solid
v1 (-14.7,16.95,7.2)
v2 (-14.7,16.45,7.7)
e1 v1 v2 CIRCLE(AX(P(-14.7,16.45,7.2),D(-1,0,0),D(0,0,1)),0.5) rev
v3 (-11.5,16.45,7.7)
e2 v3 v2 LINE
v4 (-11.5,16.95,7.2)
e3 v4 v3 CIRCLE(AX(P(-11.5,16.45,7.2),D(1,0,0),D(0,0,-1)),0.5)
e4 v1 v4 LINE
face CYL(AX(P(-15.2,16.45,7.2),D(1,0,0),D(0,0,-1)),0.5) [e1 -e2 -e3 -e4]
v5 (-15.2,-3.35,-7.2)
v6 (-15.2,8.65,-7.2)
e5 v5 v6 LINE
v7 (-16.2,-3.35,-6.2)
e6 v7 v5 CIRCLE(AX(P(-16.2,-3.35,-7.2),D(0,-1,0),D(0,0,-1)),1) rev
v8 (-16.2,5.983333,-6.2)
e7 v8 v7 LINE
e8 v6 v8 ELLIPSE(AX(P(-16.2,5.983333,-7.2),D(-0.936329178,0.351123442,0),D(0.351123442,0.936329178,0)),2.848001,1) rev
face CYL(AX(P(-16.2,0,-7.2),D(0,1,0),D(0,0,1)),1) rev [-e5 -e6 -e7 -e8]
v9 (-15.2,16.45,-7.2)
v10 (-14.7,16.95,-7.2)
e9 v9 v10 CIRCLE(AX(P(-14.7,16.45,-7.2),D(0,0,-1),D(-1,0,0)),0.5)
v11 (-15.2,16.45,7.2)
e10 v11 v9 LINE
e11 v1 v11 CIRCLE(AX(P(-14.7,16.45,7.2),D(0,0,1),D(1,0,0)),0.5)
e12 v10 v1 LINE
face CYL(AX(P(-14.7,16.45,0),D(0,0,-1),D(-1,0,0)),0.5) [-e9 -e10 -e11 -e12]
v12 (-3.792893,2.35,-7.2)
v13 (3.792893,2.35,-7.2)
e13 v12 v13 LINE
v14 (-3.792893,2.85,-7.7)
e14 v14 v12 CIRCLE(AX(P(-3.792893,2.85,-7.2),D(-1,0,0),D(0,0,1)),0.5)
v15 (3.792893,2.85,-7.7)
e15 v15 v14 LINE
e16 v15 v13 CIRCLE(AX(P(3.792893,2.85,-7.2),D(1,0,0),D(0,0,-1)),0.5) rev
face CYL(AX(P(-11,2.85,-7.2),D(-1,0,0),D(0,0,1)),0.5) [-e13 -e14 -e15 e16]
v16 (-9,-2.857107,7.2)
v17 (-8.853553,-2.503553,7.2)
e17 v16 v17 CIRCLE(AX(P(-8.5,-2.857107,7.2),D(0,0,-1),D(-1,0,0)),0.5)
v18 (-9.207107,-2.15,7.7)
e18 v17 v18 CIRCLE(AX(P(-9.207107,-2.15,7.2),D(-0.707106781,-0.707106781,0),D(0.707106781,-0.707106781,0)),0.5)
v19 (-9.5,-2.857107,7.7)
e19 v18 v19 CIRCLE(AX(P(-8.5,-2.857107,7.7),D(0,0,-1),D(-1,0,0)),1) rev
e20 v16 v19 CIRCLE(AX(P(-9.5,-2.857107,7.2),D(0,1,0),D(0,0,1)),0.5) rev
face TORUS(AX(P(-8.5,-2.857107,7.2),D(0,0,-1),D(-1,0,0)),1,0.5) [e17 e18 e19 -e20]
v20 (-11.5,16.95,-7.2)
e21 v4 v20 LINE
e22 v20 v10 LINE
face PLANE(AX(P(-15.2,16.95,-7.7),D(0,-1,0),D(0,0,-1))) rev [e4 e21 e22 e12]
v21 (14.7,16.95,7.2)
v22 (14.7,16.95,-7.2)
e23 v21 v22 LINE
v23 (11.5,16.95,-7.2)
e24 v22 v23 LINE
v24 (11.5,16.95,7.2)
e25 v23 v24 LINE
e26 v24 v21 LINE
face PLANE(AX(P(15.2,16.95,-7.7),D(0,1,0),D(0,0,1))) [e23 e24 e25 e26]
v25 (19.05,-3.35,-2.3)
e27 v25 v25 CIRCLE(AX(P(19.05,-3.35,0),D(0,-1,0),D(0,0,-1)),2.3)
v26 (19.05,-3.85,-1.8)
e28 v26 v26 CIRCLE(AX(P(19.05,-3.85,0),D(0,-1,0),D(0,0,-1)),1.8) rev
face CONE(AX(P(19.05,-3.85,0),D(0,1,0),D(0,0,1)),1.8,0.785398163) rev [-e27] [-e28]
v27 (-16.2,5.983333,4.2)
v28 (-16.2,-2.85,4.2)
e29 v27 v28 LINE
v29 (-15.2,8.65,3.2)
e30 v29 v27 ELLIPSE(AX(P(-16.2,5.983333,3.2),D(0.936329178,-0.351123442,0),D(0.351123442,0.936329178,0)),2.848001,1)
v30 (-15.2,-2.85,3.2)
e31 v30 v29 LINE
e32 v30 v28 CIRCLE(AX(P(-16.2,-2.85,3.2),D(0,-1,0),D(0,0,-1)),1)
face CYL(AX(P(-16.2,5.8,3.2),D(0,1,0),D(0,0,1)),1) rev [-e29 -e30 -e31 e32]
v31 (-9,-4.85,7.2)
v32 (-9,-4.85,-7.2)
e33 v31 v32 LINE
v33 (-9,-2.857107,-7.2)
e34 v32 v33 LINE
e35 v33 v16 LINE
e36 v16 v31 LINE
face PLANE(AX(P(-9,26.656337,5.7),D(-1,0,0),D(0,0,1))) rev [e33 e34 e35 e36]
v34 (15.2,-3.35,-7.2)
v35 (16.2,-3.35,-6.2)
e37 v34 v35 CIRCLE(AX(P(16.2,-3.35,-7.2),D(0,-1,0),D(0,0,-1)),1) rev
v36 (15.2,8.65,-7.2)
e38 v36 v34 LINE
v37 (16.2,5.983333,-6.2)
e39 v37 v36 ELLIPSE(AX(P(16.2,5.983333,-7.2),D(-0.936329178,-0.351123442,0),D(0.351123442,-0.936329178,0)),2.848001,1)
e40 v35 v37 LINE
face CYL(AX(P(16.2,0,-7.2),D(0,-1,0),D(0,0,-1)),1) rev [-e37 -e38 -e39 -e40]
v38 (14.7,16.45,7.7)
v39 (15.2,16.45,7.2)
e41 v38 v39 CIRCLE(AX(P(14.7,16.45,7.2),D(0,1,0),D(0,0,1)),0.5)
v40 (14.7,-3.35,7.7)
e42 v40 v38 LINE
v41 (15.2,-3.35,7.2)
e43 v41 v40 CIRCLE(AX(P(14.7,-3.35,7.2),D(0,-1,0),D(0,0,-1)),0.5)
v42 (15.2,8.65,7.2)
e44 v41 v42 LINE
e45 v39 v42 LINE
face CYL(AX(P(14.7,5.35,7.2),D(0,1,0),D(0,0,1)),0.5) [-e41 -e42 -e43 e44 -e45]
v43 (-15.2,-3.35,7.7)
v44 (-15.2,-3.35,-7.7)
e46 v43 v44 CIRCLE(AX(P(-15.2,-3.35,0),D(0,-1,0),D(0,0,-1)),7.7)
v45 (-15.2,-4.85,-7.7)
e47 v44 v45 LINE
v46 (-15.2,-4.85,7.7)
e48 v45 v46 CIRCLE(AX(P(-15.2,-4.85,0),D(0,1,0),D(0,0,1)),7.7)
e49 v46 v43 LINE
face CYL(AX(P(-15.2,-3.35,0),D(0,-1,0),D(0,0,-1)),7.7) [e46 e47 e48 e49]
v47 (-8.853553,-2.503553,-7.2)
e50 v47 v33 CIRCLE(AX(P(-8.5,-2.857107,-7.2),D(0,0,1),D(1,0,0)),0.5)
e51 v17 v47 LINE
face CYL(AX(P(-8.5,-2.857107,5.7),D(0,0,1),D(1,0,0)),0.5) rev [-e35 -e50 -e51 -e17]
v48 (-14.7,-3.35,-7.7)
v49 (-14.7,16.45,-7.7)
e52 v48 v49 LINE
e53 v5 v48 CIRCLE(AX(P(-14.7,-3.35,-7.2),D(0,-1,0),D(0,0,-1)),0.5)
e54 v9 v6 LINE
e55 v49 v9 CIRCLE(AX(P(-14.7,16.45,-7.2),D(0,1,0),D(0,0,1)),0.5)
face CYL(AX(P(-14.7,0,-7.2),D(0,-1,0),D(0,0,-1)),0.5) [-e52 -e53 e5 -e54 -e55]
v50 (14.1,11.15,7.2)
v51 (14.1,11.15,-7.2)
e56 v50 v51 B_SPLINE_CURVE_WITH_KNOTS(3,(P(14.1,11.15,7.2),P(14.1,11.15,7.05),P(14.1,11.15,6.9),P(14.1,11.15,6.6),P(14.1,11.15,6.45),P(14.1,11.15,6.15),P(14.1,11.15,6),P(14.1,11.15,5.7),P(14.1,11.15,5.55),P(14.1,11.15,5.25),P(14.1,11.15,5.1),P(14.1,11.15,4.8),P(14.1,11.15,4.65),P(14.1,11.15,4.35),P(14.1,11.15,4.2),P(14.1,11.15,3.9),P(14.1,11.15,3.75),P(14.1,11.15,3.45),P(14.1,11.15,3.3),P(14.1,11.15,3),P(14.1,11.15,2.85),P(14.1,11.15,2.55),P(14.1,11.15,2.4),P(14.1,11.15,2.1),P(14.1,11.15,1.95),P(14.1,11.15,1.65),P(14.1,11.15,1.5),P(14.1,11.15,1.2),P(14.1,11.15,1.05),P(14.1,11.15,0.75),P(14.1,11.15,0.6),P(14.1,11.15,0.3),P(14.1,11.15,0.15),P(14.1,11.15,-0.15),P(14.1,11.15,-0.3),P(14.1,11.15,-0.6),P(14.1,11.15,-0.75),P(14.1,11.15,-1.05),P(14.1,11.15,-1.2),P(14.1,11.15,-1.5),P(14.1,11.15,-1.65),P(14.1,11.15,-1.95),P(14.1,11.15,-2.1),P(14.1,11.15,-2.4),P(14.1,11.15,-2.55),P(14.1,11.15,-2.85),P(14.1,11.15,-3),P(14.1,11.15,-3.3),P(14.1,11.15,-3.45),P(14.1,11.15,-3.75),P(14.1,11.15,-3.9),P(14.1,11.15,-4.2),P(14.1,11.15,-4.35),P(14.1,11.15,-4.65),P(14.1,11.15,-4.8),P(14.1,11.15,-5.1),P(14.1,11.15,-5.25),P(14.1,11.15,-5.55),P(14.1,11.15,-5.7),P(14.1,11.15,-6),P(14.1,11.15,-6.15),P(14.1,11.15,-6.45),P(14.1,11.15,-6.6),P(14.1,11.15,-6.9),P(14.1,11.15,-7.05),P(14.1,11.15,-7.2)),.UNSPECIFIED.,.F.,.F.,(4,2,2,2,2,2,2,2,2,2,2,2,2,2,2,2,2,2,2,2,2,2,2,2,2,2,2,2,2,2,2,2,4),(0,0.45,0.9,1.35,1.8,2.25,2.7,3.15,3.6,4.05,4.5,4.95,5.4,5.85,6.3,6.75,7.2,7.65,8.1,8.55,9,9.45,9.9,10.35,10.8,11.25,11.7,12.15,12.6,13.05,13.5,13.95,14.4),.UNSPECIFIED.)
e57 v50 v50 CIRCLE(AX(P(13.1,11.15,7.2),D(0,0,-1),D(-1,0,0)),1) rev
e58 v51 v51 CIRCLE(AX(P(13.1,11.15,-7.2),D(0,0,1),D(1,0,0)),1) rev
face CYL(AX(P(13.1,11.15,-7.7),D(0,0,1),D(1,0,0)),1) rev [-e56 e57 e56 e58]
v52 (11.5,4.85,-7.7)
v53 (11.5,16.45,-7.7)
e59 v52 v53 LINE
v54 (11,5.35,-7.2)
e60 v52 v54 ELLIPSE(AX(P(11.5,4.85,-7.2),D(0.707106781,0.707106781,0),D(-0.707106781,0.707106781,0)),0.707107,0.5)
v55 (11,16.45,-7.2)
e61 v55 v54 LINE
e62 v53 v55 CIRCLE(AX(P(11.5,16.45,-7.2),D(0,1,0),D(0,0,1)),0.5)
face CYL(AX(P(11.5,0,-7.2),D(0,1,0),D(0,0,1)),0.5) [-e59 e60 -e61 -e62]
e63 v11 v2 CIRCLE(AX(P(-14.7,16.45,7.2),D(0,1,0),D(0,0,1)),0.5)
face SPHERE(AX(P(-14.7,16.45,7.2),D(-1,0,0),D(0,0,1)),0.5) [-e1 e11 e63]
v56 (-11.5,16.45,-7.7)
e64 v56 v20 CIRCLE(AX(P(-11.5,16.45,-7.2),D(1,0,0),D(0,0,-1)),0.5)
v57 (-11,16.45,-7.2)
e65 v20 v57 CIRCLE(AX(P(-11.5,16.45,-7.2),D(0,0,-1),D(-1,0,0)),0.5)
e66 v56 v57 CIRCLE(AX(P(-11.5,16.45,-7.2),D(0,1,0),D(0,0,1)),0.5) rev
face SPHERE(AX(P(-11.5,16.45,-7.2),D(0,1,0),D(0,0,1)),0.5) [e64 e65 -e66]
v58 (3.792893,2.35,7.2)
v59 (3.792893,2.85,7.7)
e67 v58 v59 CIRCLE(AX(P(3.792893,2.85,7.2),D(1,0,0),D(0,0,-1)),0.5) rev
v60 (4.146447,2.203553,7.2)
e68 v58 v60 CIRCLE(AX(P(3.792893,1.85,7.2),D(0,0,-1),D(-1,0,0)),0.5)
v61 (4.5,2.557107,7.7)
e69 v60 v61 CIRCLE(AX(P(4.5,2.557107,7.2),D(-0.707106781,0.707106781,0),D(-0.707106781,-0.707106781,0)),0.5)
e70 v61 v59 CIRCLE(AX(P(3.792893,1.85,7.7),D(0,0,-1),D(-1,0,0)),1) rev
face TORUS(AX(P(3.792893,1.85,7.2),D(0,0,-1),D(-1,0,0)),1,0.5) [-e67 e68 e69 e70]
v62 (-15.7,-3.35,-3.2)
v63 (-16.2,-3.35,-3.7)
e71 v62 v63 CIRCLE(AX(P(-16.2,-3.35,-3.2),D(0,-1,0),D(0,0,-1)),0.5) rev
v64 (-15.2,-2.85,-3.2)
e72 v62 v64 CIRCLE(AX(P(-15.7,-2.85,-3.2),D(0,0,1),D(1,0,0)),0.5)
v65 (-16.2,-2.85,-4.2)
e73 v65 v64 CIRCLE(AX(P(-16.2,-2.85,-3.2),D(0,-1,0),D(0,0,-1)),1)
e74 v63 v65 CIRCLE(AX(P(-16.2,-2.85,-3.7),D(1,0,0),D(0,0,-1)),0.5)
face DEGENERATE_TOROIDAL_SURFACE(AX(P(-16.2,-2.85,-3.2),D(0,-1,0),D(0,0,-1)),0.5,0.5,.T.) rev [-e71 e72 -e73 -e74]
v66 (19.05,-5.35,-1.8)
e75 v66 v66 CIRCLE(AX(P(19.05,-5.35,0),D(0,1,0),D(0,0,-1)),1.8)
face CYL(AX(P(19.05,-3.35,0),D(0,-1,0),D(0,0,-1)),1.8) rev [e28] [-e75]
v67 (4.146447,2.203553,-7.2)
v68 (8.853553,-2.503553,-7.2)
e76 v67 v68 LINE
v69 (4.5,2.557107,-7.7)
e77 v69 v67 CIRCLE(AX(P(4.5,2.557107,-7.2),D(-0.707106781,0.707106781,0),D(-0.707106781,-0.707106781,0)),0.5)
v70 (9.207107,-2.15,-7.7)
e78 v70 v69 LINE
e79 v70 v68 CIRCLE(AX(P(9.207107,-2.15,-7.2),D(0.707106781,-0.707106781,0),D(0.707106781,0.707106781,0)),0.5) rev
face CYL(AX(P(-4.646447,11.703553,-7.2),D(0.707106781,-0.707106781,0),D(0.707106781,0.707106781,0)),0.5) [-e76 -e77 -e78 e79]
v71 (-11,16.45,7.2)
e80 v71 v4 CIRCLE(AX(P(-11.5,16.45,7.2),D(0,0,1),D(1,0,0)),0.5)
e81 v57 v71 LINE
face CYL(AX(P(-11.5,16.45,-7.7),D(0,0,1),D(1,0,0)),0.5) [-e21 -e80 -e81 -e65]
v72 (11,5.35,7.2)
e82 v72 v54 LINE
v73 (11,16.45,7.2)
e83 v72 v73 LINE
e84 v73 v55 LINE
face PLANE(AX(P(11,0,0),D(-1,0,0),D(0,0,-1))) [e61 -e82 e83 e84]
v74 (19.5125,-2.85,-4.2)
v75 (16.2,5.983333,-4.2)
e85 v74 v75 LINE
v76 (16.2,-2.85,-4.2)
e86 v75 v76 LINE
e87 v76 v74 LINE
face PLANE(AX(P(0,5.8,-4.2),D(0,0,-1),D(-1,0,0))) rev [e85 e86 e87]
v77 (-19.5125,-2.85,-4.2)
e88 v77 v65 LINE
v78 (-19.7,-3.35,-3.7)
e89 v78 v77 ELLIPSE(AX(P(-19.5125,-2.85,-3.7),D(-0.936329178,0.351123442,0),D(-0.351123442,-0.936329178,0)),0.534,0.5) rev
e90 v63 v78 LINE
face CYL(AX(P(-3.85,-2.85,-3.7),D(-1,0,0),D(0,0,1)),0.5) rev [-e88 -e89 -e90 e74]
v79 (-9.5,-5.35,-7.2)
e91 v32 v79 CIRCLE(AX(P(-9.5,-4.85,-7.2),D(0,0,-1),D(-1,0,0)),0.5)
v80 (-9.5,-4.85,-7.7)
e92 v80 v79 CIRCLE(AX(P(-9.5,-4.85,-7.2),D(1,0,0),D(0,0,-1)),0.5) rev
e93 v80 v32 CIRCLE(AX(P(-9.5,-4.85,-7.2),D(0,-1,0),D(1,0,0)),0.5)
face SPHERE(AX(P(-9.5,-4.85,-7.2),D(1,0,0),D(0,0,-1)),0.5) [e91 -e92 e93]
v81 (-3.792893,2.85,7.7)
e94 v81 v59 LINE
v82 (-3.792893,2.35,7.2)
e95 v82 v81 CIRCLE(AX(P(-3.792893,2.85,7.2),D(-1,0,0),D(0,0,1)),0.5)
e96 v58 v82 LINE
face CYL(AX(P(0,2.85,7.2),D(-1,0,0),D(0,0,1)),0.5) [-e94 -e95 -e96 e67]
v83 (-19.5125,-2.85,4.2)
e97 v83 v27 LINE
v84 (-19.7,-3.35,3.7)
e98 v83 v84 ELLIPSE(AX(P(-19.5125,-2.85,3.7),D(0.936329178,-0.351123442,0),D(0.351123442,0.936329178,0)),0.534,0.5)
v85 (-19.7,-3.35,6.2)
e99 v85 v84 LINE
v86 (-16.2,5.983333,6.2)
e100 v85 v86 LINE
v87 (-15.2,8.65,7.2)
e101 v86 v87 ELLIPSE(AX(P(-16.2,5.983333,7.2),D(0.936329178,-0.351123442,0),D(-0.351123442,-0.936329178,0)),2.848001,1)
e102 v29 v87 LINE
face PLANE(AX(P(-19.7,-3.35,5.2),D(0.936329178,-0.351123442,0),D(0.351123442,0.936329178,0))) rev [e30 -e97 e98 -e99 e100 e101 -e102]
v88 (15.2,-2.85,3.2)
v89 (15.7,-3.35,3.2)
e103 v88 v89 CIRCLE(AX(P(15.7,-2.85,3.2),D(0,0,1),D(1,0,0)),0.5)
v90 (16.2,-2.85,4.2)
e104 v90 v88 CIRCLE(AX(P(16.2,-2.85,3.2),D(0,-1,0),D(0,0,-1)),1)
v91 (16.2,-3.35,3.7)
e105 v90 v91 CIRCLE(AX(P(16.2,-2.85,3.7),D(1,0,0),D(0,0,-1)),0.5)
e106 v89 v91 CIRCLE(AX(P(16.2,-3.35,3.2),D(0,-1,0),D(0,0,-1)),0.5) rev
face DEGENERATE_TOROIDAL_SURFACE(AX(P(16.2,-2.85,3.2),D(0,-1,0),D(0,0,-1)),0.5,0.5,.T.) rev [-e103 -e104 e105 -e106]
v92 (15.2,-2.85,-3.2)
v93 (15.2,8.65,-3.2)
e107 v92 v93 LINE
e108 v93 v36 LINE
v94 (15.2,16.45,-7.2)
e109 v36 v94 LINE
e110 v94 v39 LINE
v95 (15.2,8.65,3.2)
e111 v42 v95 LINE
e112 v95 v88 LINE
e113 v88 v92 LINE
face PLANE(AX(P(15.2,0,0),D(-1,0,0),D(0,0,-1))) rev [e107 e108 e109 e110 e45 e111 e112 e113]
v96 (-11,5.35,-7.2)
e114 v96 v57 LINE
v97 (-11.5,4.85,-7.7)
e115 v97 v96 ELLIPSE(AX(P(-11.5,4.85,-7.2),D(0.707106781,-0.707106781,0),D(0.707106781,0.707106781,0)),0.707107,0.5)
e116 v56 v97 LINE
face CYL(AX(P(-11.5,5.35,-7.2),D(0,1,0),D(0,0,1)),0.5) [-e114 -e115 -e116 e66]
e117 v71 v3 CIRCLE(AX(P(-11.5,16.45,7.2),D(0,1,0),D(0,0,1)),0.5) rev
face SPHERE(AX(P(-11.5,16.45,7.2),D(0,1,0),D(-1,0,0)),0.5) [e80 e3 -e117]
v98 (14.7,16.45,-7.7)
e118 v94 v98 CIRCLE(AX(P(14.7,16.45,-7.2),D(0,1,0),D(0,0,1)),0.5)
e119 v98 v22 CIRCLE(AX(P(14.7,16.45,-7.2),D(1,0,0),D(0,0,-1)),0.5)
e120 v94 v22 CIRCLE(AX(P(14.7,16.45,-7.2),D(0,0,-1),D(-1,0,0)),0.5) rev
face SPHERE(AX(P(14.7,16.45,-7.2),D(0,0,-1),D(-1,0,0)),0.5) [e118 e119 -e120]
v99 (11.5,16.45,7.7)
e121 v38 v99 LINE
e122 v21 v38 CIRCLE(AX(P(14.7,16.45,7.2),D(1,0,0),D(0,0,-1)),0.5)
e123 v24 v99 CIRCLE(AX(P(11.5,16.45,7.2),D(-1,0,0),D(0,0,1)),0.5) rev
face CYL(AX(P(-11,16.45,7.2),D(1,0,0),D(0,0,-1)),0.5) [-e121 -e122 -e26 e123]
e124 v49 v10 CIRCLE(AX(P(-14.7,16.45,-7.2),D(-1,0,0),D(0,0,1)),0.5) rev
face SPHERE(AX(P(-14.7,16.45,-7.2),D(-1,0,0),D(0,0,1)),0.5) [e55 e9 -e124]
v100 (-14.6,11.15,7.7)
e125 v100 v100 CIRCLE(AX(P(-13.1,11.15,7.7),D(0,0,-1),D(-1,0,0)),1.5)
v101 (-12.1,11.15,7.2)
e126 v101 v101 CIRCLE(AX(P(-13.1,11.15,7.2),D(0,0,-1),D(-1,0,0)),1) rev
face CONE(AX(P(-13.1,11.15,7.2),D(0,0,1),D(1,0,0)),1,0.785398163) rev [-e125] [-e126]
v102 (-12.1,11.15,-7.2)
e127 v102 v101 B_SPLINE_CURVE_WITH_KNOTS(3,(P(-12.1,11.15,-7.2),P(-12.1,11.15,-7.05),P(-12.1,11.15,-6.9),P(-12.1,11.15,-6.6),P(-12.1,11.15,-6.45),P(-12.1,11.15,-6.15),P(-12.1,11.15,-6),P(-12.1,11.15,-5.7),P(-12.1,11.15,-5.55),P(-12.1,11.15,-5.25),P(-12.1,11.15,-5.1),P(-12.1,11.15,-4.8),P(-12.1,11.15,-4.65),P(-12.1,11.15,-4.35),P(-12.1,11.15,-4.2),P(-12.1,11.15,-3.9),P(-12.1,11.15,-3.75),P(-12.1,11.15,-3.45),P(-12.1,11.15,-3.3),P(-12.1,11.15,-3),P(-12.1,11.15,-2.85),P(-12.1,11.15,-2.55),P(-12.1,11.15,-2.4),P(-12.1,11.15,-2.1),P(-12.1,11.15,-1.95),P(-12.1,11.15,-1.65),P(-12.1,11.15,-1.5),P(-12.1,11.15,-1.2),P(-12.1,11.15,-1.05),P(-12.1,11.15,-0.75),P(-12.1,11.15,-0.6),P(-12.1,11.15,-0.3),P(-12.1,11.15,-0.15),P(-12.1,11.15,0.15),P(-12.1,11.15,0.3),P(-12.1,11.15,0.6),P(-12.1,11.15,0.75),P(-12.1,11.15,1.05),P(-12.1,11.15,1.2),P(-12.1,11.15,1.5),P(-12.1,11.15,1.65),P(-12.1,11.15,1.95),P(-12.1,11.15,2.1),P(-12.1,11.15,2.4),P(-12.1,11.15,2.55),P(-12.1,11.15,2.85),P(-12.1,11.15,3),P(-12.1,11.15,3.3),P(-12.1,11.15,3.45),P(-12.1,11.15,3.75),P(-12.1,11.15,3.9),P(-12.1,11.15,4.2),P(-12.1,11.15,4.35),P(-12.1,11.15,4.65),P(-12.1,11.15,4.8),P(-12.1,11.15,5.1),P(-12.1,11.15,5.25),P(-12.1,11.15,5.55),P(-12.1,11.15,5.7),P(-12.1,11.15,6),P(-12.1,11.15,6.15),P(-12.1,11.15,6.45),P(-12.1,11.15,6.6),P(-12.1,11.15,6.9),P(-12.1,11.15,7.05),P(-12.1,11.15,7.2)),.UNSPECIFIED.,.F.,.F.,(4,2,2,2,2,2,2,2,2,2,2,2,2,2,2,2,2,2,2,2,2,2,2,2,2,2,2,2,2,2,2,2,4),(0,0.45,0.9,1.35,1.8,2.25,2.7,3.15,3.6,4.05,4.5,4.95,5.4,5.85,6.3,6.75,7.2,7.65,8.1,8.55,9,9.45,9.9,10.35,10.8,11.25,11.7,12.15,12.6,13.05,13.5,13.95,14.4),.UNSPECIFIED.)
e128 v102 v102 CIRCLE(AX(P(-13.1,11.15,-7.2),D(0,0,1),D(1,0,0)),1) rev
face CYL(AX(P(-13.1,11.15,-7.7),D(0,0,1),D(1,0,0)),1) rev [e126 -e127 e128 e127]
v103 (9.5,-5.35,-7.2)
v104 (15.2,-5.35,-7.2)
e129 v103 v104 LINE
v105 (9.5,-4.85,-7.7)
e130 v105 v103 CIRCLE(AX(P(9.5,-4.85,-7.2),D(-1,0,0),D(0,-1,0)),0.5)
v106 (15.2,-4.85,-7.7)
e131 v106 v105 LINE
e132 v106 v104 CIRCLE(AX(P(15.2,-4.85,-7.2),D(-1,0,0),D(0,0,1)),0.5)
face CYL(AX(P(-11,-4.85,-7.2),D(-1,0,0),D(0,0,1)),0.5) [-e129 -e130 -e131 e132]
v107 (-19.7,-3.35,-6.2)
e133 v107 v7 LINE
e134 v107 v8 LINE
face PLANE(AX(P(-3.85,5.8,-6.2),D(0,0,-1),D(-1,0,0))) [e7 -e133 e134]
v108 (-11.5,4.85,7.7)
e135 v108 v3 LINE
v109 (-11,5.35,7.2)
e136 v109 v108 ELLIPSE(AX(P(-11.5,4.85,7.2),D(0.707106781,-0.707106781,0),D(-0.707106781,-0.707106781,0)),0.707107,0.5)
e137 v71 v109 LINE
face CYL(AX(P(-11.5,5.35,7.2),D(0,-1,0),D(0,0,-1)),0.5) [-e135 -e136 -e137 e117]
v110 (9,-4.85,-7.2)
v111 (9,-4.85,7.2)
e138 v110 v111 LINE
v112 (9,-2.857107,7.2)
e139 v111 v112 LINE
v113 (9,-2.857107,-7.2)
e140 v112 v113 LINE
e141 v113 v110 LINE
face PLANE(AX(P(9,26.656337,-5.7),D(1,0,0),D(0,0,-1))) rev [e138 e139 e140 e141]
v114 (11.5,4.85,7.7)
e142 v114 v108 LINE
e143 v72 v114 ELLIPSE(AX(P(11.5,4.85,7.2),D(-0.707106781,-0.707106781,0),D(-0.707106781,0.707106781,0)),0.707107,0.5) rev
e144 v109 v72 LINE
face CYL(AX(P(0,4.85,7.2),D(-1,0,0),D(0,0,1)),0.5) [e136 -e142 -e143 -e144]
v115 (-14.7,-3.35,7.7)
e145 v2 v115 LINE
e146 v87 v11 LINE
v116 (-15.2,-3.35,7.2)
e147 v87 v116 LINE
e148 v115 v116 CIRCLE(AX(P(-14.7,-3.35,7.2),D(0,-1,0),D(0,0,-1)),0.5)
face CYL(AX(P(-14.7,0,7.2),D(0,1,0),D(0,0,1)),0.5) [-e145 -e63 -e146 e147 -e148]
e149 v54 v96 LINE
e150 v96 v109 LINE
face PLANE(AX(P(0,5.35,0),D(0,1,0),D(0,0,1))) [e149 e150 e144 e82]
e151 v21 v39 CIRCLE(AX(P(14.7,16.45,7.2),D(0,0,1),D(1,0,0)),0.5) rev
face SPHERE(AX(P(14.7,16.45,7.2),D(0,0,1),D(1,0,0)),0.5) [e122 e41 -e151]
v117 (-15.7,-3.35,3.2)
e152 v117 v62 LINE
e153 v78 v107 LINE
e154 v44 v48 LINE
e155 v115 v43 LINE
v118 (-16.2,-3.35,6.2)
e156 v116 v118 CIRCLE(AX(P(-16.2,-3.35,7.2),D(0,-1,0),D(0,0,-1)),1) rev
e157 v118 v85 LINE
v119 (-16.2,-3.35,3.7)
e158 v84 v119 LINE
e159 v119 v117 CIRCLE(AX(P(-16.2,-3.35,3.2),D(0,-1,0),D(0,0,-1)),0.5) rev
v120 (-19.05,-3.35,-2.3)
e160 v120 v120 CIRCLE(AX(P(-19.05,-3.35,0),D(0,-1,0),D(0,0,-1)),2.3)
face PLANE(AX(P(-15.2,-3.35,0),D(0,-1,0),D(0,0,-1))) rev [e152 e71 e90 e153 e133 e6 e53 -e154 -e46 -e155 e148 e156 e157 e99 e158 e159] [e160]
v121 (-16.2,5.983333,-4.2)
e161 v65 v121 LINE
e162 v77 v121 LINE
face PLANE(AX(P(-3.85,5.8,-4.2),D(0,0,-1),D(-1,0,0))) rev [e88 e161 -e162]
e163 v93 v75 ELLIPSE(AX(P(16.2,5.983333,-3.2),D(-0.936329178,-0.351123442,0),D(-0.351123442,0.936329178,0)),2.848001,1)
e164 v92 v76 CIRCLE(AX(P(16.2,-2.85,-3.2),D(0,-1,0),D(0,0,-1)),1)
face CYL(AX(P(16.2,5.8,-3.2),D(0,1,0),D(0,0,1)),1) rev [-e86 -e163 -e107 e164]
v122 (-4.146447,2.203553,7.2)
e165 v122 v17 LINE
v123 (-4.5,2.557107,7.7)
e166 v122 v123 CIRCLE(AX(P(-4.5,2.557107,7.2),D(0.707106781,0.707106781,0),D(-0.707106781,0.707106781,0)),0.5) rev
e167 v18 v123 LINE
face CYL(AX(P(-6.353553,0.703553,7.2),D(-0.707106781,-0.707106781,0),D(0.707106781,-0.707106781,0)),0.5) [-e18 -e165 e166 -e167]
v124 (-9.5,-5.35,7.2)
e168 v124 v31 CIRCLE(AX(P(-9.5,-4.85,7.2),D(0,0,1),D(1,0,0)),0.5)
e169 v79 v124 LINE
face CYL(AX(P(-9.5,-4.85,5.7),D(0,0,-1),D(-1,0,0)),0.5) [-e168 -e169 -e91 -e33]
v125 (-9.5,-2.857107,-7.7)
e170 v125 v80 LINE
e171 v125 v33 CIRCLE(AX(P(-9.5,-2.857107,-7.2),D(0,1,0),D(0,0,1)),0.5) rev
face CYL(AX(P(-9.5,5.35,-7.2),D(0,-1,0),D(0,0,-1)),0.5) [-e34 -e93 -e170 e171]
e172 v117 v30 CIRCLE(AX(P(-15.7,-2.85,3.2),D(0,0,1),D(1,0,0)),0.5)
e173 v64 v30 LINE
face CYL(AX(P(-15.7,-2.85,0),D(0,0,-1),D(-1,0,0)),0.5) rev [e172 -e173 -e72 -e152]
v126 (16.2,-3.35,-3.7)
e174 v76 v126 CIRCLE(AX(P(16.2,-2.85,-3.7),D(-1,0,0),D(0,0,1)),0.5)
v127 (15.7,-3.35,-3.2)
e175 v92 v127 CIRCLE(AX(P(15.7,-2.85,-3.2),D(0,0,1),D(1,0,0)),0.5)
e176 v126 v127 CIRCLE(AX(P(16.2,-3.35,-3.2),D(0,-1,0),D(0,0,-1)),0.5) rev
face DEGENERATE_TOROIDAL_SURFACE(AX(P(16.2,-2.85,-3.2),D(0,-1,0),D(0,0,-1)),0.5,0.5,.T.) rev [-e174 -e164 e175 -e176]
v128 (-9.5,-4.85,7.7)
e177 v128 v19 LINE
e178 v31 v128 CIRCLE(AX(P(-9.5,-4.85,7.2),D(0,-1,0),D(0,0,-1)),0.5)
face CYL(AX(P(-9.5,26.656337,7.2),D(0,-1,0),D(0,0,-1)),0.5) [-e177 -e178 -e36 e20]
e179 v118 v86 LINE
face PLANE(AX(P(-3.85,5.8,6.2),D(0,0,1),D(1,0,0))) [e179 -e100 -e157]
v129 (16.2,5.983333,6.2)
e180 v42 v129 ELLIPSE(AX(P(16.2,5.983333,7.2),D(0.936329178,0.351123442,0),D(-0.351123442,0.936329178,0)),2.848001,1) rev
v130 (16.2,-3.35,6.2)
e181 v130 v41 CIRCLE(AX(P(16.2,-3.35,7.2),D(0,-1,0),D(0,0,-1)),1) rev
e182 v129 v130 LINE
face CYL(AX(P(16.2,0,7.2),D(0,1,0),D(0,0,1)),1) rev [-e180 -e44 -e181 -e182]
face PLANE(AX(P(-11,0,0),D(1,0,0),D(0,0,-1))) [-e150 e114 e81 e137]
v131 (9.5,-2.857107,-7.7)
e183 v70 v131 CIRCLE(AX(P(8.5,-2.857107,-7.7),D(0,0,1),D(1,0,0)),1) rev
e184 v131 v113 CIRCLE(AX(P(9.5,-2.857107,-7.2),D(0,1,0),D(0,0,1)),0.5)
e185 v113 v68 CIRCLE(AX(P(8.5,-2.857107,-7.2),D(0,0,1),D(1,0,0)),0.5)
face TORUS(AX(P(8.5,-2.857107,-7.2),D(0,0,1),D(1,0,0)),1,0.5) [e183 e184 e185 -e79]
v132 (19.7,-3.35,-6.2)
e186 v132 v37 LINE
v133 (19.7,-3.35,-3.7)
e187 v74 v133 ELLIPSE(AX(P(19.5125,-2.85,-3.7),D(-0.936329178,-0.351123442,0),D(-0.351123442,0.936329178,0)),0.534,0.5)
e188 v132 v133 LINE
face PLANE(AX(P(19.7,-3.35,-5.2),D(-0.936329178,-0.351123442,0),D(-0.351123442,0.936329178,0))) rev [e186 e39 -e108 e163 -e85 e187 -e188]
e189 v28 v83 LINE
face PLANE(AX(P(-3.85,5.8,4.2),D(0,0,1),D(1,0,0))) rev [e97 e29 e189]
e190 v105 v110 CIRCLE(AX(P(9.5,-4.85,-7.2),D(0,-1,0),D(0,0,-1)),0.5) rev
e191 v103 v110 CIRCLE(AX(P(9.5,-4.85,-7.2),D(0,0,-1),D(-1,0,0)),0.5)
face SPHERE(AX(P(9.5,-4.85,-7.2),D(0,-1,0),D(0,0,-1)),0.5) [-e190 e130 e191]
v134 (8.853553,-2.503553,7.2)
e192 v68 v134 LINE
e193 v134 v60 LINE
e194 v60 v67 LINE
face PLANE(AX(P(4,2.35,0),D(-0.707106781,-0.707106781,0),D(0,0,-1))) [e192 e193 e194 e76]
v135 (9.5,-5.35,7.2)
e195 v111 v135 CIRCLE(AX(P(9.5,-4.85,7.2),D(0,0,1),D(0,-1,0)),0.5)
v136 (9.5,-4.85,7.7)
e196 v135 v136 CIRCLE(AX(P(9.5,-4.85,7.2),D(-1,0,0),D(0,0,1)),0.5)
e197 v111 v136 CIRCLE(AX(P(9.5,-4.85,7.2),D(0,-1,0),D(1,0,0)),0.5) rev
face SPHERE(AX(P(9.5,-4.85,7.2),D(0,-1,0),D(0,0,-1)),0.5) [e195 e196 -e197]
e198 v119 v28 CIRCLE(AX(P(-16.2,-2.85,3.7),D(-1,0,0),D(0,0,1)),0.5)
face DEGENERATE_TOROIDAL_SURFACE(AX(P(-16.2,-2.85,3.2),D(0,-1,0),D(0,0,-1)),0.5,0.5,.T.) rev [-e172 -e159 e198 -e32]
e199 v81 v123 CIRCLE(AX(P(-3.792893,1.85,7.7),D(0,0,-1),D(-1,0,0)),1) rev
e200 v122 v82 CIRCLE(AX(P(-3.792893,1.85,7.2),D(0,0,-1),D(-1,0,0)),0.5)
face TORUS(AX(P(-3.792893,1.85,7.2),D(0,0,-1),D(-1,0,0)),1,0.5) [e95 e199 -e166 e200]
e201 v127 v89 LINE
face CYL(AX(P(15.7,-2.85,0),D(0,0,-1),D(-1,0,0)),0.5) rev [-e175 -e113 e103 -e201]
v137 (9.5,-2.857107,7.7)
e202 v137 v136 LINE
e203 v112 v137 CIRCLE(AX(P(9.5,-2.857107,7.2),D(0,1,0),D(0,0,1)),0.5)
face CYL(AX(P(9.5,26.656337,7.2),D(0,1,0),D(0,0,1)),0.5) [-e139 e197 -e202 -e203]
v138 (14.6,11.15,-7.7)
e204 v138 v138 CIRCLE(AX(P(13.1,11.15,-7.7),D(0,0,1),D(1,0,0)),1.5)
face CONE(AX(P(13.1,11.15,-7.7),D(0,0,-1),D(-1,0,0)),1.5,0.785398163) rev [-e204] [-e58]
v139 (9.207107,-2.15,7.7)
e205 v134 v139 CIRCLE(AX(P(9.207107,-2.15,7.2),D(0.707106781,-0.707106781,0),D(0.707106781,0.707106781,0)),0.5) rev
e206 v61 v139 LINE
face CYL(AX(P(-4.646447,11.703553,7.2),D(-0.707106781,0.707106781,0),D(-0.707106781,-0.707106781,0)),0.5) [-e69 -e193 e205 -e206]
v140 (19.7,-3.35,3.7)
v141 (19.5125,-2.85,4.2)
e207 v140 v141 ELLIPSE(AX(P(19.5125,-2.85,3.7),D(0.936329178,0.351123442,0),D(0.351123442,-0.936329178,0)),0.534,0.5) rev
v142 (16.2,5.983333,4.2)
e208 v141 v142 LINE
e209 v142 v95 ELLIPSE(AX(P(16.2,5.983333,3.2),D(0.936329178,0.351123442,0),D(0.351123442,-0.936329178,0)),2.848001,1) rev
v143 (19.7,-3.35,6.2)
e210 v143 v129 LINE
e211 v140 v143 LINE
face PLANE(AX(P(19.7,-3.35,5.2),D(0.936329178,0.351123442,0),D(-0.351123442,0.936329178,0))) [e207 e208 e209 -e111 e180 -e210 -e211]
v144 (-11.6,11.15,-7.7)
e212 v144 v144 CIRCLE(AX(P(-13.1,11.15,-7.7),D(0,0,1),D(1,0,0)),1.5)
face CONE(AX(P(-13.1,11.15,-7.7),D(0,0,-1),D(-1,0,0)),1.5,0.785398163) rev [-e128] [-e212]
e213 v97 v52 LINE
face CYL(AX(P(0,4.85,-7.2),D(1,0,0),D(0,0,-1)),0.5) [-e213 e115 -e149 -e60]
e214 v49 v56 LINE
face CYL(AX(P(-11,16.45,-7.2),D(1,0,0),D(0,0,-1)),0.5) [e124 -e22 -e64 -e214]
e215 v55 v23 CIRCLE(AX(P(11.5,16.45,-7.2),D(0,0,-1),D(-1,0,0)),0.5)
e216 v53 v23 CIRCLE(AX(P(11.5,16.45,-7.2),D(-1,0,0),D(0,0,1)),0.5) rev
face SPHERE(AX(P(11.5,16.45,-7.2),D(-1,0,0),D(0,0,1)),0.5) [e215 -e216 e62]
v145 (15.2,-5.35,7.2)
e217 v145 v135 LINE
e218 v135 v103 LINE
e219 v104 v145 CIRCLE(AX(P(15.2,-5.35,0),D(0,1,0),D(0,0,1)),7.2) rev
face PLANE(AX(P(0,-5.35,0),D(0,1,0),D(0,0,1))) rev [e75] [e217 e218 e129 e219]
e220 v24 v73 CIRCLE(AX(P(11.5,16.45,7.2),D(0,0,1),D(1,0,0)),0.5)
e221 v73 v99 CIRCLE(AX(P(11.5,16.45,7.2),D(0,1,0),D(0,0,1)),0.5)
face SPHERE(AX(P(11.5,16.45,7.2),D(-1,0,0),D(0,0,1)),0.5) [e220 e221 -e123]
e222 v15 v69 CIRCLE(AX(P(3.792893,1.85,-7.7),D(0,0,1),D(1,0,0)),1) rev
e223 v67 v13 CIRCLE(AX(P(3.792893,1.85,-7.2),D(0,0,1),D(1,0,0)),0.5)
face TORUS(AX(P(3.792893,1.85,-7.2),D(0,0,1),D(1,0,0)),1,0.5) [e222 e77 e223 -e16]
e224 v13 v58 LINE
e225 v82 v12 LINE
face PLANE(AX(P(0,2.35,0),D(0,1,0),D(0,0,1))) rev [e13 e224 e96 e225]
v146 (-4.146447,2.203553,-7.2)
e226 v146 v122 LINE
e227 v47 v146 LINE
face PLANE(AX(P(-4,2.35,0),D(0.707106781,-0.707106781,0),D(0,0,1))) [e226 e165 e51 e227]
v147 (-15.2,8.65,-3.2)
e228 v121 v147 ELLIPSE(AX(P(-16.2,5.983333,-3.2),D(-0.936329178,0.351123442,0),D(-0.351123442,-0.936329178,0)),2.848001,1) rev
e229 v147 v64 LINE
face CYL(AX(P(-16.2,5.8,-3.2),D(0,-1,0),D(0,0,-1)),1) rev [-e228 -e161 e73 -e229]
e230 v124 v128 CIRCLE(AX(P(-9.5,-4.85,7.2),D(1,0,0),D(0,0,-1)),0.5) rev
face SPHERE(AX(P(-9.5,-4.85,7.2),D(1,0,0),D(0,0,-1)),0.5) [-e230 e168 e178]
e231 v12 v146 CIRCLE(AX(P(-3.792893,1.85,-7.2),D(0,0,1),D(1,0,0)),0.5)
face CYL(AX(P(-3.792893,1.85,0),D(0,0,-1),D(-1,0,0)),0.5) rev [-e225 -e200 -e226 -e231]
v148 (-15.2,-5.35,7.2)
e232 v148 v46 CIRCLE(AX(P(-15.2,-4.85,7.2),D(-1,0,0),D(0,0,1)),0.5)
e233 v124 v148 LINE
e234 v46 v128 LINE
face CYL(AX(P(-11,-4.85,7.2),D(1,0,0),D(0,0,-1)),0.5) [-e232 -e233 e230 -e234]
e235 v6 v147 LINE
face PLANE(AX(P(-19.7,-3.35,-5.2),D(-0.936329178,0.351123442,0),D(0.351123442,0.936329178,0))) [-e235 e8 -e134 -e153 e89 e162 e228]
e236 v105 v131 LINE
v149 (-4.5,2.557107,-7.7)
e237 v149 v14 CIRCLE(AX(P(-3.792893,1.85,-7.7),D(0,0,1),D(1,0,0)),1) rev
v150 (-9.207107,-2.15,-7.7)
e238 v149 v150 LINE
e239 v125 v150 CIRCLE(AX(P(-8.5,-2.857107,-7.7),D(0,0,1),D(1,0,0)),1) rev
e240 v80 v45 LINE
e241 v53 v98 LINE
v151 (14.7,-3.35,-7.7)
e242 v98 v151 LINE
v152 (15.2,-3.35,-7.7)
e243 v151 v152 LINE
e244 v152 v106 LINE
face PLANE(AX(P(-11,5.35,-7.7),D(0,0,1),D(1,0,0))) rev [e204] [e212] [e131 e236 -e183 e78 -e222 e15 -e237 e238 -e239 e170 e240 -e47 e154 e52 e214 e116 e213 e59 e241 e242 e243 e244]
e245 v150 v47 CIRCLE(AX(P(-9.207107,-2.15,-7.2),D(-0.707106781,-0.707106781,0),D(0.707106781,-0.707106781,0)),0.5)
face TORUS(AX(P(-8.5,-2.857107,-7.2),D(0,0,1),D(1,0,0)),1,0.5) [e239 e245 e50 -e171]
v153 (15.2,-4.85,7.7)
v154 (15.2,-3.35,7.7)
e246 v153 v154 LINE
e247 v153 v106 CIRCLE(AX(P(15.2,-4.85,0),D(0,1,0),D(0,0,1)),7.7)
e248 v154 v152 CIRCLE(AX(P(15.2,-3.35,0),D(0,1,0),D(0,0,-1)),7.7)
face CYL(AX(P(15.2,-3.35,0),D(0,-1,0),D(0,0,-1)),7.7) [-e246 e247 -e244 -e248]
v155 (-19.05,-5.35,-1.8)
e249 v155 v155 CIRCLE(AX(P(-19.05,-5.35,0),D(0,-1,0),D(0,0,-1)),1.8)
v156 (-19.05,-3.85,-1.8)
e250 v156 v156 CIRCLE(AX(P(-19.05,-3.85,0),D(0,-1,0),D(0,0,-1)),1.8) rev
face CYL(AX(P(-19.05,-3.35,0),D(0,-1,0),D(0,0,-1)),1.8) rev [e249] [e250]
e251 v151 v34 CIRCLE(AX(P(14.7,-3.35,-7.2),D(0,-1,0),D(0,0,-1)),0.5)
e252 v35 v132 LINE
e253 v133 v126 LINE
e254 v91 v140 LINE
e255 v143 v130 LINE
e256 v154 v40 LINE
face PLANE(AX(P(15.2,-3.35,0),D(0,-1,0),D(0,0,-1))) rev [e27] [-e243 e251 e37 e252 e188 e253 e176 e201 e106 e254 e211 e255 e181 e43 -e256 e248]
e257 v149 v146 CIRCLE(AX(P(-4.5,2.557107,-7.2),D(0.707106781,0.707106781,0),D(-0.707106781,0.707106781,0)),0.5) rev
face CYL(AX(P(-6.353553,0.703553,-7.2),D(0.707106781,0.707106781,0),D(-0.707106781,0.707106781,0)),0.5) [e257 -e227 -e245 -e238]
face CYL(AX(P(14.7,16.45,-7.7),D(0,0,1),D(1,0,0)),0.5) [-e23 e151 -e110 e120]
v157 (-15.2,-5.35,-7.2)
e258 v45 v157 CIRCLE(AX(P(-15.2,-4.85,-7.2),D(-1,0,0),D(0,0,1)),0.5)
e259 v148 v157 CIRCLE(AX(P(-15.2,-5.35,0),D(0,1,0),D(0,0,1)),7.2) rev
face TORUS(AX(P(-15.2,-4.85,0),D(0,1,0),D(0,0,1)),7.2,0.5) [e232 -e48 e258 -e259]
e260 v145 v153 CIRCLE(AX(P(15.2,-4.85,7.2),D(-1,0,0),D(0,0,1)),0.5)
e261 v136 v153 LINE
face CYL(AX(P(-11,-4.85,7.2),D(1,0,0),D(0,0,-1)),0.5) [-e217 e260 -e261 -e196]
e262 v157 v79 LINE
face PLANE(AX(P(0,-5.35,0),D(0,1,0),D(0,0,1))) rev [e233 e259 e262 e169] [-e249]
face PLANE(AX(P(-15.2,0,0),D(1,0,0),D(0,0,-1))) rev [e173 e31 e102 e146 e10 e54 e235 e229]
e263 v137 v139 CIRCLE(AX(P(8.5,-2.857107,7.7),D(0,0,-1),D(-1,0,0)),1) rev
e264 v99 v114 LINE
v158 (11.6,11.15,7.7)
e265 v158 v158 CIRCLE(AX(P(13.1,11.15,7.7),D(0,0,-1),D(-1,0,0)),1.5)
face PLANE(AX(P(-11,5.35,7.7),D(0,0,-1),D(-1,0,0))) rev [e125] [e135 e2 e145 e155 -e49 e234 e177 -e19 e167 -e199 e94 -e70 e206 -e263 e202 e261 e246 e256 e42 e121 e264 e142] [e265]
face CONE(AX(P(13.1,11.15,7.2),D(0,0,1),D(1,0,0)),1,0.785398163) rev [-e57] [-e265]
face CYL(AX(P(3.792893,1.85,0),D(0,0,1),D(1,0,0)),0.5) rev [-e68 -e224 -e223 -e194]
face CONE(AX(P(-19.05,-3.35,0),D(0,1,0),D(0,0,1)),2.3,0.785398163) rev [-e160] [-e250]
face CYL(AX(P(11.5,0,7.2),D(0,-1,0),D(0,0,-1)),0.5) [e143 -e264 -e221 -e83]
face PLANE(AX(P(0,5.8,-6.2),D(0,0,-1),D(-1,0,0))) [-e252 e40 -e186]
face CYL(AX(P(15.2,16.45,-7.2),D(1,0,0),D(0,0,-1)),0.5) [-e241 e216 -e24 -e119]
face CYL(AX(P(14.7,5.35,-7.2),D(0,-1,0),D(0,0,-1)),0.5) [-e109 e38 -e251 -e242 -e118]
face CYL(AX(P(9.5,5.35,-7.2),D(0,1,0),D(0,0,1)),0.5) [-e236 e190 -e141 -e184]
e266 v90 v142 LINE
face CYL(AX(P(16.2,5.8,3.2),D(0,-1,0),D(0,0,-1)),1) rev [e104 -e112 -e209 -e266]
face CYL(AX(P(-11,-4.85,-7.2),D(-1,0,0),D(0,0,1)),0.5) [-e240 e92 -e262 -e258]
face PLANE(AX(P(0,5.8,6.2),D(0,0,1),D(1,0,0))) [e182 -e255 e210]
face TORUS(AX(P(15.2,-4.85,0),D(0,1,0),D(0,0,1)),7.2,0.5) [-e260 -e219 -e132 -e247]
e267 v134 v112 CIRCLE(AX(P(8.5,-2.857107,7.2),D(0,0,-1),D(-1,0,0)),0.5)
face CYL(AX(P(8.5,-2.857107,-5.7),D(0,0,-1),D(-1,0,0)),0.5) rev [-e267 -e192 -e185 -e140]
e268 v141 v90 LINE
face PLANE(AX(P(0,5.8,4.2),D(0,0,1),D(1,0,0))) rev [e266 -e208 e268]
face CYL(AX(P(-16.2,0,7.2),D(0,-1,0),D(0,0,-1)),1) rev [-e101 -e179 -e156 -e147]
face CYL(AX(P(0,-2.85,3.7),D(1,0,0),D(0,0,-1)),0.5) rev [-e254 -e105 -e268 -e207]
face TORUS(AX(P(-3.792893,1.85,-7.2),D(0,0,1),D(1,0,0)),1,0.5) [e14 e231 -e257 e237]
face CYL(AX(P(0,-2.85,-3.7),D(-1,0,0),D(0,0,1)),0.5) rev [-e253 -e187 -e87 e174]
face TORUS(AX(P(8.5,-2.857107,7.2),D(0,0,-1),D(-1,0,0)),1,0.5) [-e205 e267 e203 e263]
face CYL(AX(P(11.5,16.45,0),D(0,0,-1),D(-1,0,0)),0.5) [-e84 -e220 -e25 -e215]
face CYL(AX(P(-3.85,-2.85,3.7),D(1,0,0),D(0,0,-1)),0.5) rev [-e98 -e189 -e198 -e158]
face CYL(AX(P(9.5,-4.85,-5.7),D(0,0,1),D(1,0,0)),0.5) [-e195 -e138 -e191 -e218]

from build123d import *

# Parameters (mm, degrees)
SKETCH1_W               = 22
SKETCH1_H               = 15.4
BOSS_EXTRUDE1_DEPTH     = 5.35
SKETCH3_W               = 18
SKETCH3_H               = 11.4
CUT_EXTRUDE2_DEPTH      = 7.7
CUT_EXTRUDE3_DEPTH      = 15.453805727
CUT_EXTRUDE3_DEPTH_BACK = 15.453805727
SKETCH8_W               = 18
SKETCH8_H               = 7.7
SKETCH2_W               = 15.4
SKETCH2_H               = 22.3
BOSS_EXTRUDE2_DEPTH     = 4.2
SKETCH4_R               = 1.8
BOSS_EXTRUDE4_DEPTH     = 2
RIB9_REACH              = 33.275
SKETCH7_WALL_W          = 77.365905698
SKETCH7_WALL_H          = 2
MIRROR4_COPY_1_REACH    = 33.275
MIRROR4_COPY_1_SKETCH_W = 77.365905698
MIRROR4_COPY_1_SKETCH_H = 2
CHAMFER1_SIZE           = 5
FILLET2_R               = 1
FILLET5_R               = 0.5
CUT_EXTRUDE5_DEPTH      = 30.512751481
CUT_EXTRUDE5_DEPTH_BACK = 30.512751481
SKETCH10_R              = 1
CHAMFER4_SIZE           = 0.5


with BuildPart() as part:
    # Sketch1 → Boss-Extrude1 (new, symmetric)
    with BuildSketch(Plane(origin=(0, 0, 0), x_dir=(1, 0, 0), z_dir=(0, 1, 0))):
        Rectangle(SKETCH1_W, SKETCH1_H)
    extrude(amount=BOSS_EXTRUDE1_DEPTH, both=True)

    # Sketch3 → Cut-Extrude2 (cut)
    with BuildSketch(Plane.XZ.offset(5.35)):
        Rectangle(SKETCH3_W, SKETCH3_H)
    extrude(amount=-CUT_EXTRUDE2_DEPTH, mode=Mode.SUBTRACT)

    # Sketch8 → Cut-Extrude3 (cut, two sides: drawn at the far end of the back side and taken through both)
    with BuildSketch(Plane.XY.offset(-CUT_EXTRUDE3_DEPTH_BACK)):
        with Locations((0, -1.5)):
            Rectangle(SKETCH8_W, SKETCH8_H)
    extrude(amount=CUT_EXTRUDE3_DEPTH + CUT_EXTRUDE3_DEPTH_BACK, mode=Mode.SUBTRACT)

    # Sketch2 → Boss-Extrude2 (add)
    with BuildSketch(Plane.ZY.offset(11)):
        with Locations((0, 5.8)):
            Rectangle(SKETCH2_W, SKETCH2_H)
    boss_extrude2 = extrude(amount=BOSS_EXTRUDE2_DEPTH)

    # Mirror1: Boss-Extrude2 across plane
    add(boss_extrude2.mirror(Plane(origin=(0, 0, 0), x_dir=(0, 0, 1), z_dir=(1, 0, 0))))

    # Sketch4 → Boss-Extrude4 (add)
    with BuildSketch(Plane.XZ.offset(5.35)):
        with BuildLine():
            Line((-15.2, -7.7), (-15.2, 7.7))
            ThreePointArc((-15.2, 7.7), (-22.9, 0), (-15.2, -7.7))
        make_face()
        with Locations(Location((-19.05, 0, 0), (0, 0, 270))):
            Circle(SKETCH4_R, mode=Mode.SUBTRACT)
    boss_extrude4 = extrude(amount=-BOSS_EXTRUDE4_DEPTH)

    # Sketch7 wall → Rib9 (add, up to next)
    with BuildSketch(Plane(origin=(-17.45, 2.65, 5.2), x_dir=(0.351123441588, 0.936329177569, 0), z_dir=(-0.936329177569, 0.351123441588, 0)), mode=Mode.PRIVATE) as rib9_sk1:
        Rectangle(SKETCH7_WALL_W, SKETCH7_WALL_H)
    rib9_tool1 = extrude(rib9_sk1.sketch, amount=-RIB9_REACH, mode=Mode.PRIVATE) - part.part
    rib9 = rib9_tool1.solids().sort_by_distance((-17.45, 2.65, 5.2))[0]
    add(rib9)

    # Mirror3: Rib9 across plane
    add(rib9.mirror(Plane.XY))

    # Mirror4: Boss-Extrude4, Rib9 across plane
    add(boss_extrude4.mirror(Plane(origin=(0, 0, 0), x_dir=(0, 0, 1), z_dir=(1, 0, 0))))
    add(rib9.mirror(Plane(origin=(0, 0, 0), x_dir=(0, 0, 1), z_dir=(1, 0, 0))))

    # Mirror4 copy 1 sketch → Mirror4 copy 1 (add, up to next)
    with BuildSketch(Plane(origin=(17.45, 2.65, -5.2), x_dir=(-0.351123441588, 0.936329177569, 0), z_dir=(0.936329177569, 0.351123441588, 0)), mode=Mode.PRIVATE) as mirror4_copy_1_sk1:
        Rectangle(MIRROR4_COPY_1_SKETCH_W, MIRROR4_COPY_1_SKETCH_H)
    mirror4_copy_1_tool1 = extrude(mirror4_copy_1_sk1.sketch, amount=-MIRROR4_COPY_1_REACH, mode=Mode.PRIVATE) - part.part
    add(mirror4_copy_1_tool1.solids().sort_by_distance((17.45, 2.65, -5.2))[0])

    # Chamfer1
    chamfer1_edges = [part.edges().sort_by_distance(p)[0] for p in [
        (-9, 2.35, 0),
        (9, 2.35, 0),
    ]]
    chamfer(chamfer1_edges, length=CHAMFER1_SIZE)

    # Fillet2
    fillet2_edges = [part.edges().sort_by_distance(p)[0] for p in [
        (-15.2, 2.65, 4.2),
        (-15.2, 2.65, 6.2),
        (-15.2, 2.65, -4.2),
        (-15.2, 2.65, -6.2),
        (15.2, 2.65, 4.2),
        (15.2, 2.65, 6.2),
        (15.2, 2.65, -4.2),
        (15.2, 2.65, -6.2),
    ]]
    fillet(fillet2_edges, radius=FILLET2_R)

    # Fillet5
    fillet5_edges = [part.edges().sort_by_distance(p)[0] for p in [
        (-17.95, -3.35, -4.2),
        (-9, -5.35, 0),
        (0, 5.35, -7.7),
        (9, -5.35, 0),
        (15.2, 6.8, 7.7),
        (15.2, -3.35, 0),
        (22.9, -5.35, 0),
        (17.95, -3.35, 4.2),
        (-12.1, -5.35, -7.7),
        (12.1, -5.35, 7.7),
        (0, 2.35, 7.7),
        (0, 2.35, -7.7),
        (4, 2.35, 0),
        (-4, 2.35, 0),
        (-9, -4, -7.7),
        (-9, -4, 7.7),
        (-9, -2.65, 0),
        (9, -2.65, 0),
        (-6.5, -0.15, -7.7),
        (-6.5, -0.15, 7.7),
        (6.5, -0.15, 7.7),
        (6.5, -0.15, -7.7),
        (17.95, -3.35, -4.2),
        (15.492893219, -3.35, 3.907106781),
        (15.492893219, -3.35, -3.907106781),
        (-17.95, -3.35, 4.2),
        (-15.2, -3.35, 0),
        (-15.492893219, -3.35, -3.907106781),
        (-15.492893219, -3.35, 3.907106781),
        (9, -4, -7.7),
        (9, -4, 7.7),
        (12.1, -5.35, -7.7),
        (-11, 11.15, -7.7),
        (-13.1, 16.95, -7.7),
        (-11, 11.15, 7.7),
        (-11, 16.95, 0),
        (-13.1, 16.95, 7.7),
        (-15.2, 6.8, -7.7),
        (-15.2, 16.95, 0),
        (-12.1, -5.35, 7.7),
        (11, 11.15, 7.7),
        (11, 16.95, 0),
        (11, 11.15, -7.7),
        (15.2, 6.8, -7.7),
        (15.2, 16.95, 0),
        (13.1, 16.95, -7.7),
        (13.1, 16.95, 7.7),
        (-15.2, 6.8, 7.7),
        (-22.9, -5.35, 0),
        (0, 5.35, 7.7),
    ]]
    fillet(fillet5_edges, radius=FILLET5_R - 0.0001)  # a hair under: the kernel refuses the full size

    # Sketch10 → Cut-Extrude5 (cut, two sides: drawn at the far end of the back side and taken through both)
    with BuildSketch(Plane.XY.offset(-CUT_EXTRUDE5_DEPTH_BACK)):
        with Locations((-13.1, 11.15)):
            Circle(SKETCH10_R)
        with Locations((13.1, 11.15)):
            Circle(SKETCH10_R)
    extrude(amount=CUT_EXTRUDE5_DEPTH + CUT_EXTRUDE5_DEPTH_BACK, mode=Mode.SUBTRACT)

    # Chamfer4
    chamfer4_edges = [part.edges().sort_by_distance(p)[0] for p in [
        (19.05, -3.35, 1.8),
        (-14.1, 11.15, -7.7),
        (-14.1, 11.15, 7.7),
        (12.1, 11.15, -7.7),
        (12.1, 11.15, 7.7),
        (-19.05, -3.35, 1.8),
    ]]
    chamfer(chamfer4_edges, length=CHAMFER4_SIZE)


solid = part.part
